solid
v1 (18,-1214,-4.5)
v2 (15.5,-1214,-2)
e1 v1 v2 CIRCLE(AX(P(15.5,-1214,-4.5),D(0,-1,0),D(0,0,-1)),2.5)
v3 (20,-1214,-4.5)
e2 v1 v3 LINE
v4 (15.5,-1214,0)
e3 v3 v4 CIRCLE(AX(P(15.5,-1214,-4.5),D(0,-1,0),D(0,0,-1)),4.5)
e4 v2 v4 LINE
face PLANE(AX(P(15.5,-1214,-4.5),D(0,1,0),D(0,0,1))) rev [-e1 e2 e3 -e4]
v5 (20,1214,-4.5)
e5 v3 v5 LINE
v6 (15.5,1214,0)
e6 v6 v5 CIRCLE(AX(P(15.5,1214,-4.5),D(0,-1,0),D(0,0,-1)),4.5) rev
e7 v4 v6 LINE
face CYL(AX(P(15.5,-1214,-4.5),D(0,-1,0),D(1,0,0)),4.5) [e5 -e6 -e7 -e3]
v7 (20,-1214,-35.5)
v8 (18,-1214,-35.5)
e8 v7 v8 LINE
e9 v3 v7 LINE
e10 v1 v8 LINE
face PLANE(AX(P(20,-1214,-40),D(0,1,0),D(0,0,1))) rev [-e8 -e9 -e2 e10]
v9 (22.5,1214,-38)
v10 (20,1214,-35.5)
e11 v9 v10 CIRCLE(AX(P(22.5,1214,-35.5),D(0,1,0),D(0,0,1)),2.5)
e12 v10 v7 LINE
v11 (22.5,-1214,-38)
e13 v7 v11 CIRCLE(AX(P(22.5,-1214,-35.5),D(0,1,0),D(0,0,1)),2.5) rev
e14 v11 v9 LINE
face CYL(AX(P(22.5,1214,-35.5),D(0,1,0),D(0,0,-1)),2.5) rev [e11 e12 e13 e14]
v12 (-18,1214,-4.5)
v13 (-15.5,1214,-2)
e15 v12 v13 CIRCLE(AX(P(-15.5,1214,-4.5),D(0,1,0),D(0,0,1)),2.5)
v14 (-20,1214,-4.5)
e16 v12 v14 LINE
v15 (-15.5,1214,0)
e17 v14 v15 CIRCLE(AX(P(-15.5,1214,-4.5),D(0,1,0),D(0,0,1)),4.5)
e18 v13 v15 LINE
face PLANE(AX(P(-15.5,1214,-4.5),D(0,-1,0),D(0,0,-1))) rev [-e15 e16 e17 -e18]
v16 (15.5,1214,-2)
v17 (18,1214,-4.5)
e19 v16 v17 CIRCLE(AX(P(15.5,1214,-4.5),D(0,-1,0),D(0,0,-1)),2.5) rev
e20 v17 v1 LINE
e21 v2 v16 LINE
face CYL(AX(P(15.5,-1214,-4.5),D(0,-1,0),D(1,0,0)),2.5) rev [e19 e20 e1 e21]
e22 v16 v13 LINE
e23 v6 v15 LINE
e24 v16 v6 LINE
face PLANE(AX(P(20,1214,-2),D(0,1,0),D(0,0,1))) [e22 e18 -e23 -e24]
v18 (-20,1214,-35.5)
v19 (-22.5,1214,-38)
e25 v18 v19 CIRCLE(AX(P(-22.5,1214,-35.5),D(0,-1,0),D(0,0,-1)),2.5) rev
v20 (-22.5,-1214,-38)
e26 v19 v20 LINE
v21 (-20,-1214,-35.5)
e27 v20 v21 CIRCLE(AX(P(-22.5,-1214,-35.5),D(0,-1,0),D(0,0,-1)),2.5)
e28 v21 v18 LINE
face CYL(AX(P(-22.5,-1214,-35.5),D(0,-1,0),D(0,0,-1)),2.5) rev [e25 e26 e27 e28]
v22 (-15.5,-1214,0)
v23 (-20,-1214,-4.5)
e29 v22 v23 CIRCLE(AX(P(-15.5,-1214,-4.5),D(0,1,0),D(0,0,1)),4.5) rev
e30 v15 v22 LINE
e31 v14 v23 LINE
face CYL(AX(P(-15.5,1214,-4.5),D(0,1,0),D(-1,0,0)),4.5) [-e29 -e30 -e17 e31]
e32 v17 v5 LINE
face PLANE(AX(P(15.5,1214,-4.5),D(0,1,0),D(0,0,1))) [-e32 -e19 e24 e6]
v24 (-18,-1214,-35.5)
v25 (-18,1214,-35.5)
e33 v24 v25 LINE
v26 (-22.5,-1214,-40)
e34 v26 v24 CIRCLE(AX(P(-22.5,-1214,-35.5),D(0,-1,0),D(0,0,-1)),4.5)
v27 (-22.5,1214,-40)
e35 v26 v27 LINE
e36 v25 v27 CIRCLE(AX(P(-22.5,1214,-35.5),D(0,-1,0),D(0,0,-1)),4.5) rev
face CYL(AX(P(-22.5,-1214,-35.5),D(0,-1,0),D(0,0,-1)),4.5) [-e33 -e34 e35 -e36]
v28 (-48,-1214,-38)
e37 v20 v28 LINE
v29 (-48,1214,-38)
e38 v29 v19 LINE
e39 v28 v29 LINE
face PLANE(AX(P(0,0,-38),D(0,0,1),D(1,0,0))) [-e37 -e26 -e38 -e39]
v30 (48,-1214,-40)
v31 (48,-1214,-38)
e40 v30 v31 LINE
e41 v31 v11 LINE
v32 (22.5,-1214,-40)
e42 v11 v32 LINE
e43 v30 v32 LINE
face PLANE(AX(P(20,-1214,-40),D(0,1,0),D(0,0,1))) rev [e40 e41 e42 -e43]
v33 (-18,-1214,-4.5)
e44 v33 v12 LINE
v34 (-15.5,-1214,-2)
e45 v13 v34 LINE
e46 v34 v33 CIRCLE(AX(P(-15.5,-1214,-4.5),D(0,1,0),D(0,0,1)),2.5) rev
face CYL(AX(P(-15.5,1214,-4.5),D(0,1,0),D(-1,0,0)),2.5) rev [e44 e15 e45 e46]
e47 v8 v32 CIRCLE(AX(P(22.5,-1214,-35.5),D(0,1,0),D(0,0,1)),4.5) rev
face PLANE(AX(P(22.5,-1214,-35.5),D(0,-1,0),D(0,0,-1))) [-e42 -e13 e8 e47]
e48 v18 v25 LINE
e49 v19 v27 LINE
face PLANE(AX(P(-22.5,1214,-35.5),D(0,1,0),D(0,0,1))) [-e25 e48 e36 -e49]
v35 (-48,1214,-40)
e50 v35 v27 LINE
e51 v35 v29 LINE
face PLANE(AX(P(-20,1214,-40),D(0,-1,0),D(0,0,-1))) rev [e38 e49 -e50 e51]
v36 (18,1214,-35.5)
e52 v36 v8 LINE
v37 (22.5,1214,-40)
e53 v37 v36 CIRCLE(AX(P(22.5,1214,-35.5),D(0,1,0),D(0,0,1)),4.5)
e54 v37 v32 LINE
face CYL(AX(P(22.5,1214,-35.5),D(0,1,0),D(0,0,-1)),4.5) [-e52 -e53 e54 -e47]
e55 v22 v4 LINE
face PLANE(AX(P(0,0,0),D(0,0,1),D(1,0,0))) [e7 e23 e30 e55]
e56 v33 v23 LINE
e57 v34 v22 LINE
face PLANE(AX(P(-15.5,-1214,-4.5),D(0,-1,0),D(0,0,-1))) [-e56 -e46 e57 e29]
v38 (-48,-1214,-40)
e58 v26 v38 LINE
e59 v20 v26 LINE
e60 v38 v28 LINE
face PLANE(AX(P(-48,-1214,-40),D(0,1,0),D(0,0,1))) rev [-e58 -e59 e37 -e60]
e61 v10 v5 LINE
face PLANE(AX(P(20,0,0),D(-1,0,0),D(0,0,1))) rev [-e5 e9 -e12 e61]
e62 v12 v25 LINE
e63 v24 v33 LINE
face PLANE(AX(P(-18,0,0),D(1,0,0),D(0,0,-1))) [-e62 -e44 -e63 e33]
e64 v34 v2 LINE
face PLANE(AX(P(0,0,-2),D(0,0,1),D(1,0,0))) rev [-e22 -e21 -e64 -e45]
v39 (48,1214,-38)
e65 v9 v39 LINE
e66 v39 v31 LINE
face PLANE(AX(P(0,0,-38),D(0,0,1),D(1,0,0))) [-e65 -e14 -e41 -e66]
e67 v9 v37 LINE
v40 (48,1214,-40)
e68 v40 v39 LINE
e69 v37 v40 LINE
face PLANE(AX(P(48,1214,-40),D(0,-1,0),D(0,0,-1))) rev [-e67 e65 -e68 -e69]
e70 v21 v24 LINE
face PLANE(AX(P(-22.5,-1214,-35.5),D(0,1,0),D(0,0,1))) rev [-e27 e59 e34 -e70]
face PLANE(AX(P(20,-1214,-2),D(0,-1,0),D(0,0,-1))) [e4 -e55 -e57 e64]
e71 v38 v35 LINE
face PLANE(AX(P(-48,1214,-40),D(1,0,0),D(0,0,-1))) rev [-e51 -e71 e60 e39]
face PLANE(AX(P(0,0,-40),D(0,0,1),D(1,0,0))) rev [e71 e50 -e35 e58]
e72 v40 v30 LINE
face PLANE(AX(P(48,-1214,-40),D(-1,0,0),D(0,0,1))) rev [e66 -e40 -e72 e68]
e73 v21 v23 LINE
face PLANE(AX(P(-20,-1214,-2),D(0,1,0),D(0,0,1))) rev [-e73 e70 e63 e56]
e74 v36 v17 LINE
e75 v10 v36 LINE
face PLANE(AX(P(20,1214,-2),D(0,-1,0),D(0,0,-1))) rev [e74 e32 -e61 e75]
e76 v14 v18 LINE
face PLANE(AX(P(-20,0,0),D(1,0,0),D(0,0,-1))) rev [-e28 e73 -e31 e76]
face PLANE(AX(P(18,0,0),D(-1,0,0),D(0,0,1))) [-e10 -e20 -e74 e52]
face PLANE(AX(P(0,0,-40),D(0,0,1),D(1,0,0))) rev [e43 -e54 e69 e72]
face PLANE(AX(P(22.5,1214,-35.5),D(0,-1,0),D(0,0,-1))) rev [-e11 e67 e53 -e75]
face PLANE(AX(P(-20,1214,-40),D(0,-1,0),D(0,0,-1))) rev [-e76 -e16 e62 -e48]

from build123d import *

# Parameters (mm, degrees)
SKETCH1_W                      = 40
SKETCH1_H                      = 2428
BASE_FLANGE1_DEPTH             = 2
EDGE_FLANGE1_STRIP_W           = 13
EDGE_FLANGE1_STRIP_H           = 2
EDGE_FLANGE1_STRIP_CUT_DEPTH   = 2428
EDGE_FLANGE1_STRIP_2_W         = 13
EDGE_FLANGE1_STRIP_2_H         = 2
EDGE_FLANGE1_STRIP_CUT_2_DEPTH = 2428
EDGE_FLANGE1_DEPTH             = 2428
EDGE_FLANGE1_BEND_DEPTH        = 2428
EDGE_FLANGE2_STRIP_W           = 13
EDGE_FLANGE2_STRIP_H           = 2
EDGE_FLANGE2_STRIP_CUT_DEPTH   = 2428
EDGE_FLANGE2_STRIP_2_W         = 13
EDGE_FLANGE2_STRIP_2_H         = 2
EDGE_FLANGE2_STRIP_CUT_2_DEPTH = 2428
EDGE_FLANGE2_DEPTH             = 2428
EDGE_FLANGE2_BEND_DEPTH        = 2428


# Sheet-metal steps are written as plain solids
with BuildPart() as part:
    # Sketch1 → Base-Flange1 (new body)
    with BuildSketch(Plane.XY):
        Rectangle(SKETCH1_W, SKETCH1_H)
    extrude(amount=-BASE_FLANGE1_DEPTH)

    # Edge-Flange1 strip (across the edge) → Edge-Flange1 strip cut (cut)
    with BuildSketch(Plane(origin=(20, 1214, -2), x_dir=(-1, 0, 0), z_dir=(0, -1, 0))):
        with Locations((-2, -1)):
            Rectangle(EDGE_FLANGE1_STRIP_W, EDGE_FLANGE1_STRIP_H)
    extrude(amount=EDGE_FLANGE1_STRIP_CUT_DEPTH, mode=Mode.SUBTRACT)

    # Edge-Flange1 strip 2 (across the edge) → Edge-Flange1 strip cut 2 (cut)
    with BuildSketch(Plane(origin=(-20, -1214, -2), x_dir=(1, 0, 0), z_dir=(0, 1, 0))):
        with Locations((-2, -1)):
            Rectangle(EDGE_FLANGE1_STRIP_2_W, EDGE_FLANGE1_STRIP_2_H)
    extrude(amount=EDGE_FLANGE1_STRIP_CUT_2_DEPTH, mode=Mode.SUBTRACT)

    # Edge-Flange1 section (across the edge) → Edge-Flange1 (add)
    with BuildSketch(Plane(origin=(20, 1214, -2), x_dir=(-1, 0, 0), z_dir=(0, -1, 0))):
        with BuildLine():
            Line((0, 2.5), (0, 38))
            Line((0, 38), (2, 38))
            Line((2, 38), (2, 2.5))
            ThreePointArc((2, 2.5), (2.732233047, 0.732233047), (4.5, 0))
            Line((4.5, 0), (4.5, -2))
            ThreePointArc((4.5, -2), (1.318019485, -0.681980515), (0, 2.5))
        make_face()
    extrude(amount=EDGE_FLANGE1_DEPTH)

    # Edge-Flange1 section 2 (across the edge) → Edge-Flange1 bend (add)
    with BuildSketch(Plane(origin=(-20, -1214, -2), x_dir=(1, 0, 0), z_dir=(0, 1, 0))):
        with BuildLine():
            Line((0, 2.5), (0, 38))
            Line((0, 38), (2, 38))
            Line((2, 38), (2, 2.5))
            ThreePointArc((2, 2.5), (2.732233047, 0.732233047), (4.5, 0))
            Line((4.5, 0), (4.5, -2))
            ThreePointArc((4.5, -2), (1.318019485, -0.681980515), (0, 2.5))
        make_face()
    extrude(amount=EDGE_FLANGE1_BEND_DEPTH)

    # Edge-Flange2 strip (across the edge) → Edge-Flange2 strip cut (cut)
    with BuildSketch(Plane(origin=(-20, 1214, -40), x_dir=(0, 0, 1), z_dir=(0, -1, 0))):
        with Locations((-2, -1)):
            Rectangle(EDGE_FLANGE2_STRIP_W, EDGE_FLANGE2_STRIP_H)
    extrude(amount=EDGE_FLANGE2_STRIP_CUT_DEPTH, mode=Mode.SUBTRACT)

    # Edge-Flange2 strip 2 (across the edge) → Edge-Flange2 strip cut 2 (cut)
    with BuildSketch(Plane(origin=(20, -1214, -40), x_dir=(0, 0, 1), z_dir=(0, 1, 0))):
        with Locations((-2, -1)):
            Rectangle(EDGE_FLANGE2_STRIP_2_W, EDGE_FLANGE2_STRIP_2_H)
    extrude(amount=EDGE_FLANGE2_STRIP_CUT_2_DEPTH, mode=Mode.SUBTRACT)

    # Edge-Flange2 section (across the edge) → Edge-Flange2 (add)
    with BuildSketch(Plane(origin=(-20, 1214, -40), x_dir=(0, 0, 1), z_dir=(0, -1, 0))):
        with BuildLine():
            Line((0, 2.5), (0, 28))
            Line((0, 28), (2, 28))
            Line((2, 28), (2, 2.5))
            ThreePointArc((2, 2.5), (2.732233047, 0.732233047), (4.5, 0))
            Line((4.5, 0), (4.5, -2))
            ThreePointArc((4.5, -2), (1.318019485, -0.681980515), (0, 2.5))
        make_face()
    extrude(amount=EDGE_FLANGE2_DEPTH)

    # Edge-Flange2 section 2 (across the edge) → Edge-Flange2 bend (add)
    with BuildSketch(Plane(origin=(20, -1214, -40), x_dir=(0, 0, 1), z_dir=(0, 1, 0))):
        with BuildLine():
            Line((0, 2.5), (0, 28))
            Line((0, 28), (2, 28))
            Line((2, 28), (2, 2.5))
            ThreePointArc((2, 2.5), (2.732233047, 0.732233047), (4.5, 0))
            Line((4.5, 0), (4.5, -2))
            ThreePointArc((4.5, -2), (1.318019485, -0.681980515), (0, 2.5))
        make_face()
    extrude(amount=EDGE_FLANGE2_BEND_DEPTH)


solid = part.part
